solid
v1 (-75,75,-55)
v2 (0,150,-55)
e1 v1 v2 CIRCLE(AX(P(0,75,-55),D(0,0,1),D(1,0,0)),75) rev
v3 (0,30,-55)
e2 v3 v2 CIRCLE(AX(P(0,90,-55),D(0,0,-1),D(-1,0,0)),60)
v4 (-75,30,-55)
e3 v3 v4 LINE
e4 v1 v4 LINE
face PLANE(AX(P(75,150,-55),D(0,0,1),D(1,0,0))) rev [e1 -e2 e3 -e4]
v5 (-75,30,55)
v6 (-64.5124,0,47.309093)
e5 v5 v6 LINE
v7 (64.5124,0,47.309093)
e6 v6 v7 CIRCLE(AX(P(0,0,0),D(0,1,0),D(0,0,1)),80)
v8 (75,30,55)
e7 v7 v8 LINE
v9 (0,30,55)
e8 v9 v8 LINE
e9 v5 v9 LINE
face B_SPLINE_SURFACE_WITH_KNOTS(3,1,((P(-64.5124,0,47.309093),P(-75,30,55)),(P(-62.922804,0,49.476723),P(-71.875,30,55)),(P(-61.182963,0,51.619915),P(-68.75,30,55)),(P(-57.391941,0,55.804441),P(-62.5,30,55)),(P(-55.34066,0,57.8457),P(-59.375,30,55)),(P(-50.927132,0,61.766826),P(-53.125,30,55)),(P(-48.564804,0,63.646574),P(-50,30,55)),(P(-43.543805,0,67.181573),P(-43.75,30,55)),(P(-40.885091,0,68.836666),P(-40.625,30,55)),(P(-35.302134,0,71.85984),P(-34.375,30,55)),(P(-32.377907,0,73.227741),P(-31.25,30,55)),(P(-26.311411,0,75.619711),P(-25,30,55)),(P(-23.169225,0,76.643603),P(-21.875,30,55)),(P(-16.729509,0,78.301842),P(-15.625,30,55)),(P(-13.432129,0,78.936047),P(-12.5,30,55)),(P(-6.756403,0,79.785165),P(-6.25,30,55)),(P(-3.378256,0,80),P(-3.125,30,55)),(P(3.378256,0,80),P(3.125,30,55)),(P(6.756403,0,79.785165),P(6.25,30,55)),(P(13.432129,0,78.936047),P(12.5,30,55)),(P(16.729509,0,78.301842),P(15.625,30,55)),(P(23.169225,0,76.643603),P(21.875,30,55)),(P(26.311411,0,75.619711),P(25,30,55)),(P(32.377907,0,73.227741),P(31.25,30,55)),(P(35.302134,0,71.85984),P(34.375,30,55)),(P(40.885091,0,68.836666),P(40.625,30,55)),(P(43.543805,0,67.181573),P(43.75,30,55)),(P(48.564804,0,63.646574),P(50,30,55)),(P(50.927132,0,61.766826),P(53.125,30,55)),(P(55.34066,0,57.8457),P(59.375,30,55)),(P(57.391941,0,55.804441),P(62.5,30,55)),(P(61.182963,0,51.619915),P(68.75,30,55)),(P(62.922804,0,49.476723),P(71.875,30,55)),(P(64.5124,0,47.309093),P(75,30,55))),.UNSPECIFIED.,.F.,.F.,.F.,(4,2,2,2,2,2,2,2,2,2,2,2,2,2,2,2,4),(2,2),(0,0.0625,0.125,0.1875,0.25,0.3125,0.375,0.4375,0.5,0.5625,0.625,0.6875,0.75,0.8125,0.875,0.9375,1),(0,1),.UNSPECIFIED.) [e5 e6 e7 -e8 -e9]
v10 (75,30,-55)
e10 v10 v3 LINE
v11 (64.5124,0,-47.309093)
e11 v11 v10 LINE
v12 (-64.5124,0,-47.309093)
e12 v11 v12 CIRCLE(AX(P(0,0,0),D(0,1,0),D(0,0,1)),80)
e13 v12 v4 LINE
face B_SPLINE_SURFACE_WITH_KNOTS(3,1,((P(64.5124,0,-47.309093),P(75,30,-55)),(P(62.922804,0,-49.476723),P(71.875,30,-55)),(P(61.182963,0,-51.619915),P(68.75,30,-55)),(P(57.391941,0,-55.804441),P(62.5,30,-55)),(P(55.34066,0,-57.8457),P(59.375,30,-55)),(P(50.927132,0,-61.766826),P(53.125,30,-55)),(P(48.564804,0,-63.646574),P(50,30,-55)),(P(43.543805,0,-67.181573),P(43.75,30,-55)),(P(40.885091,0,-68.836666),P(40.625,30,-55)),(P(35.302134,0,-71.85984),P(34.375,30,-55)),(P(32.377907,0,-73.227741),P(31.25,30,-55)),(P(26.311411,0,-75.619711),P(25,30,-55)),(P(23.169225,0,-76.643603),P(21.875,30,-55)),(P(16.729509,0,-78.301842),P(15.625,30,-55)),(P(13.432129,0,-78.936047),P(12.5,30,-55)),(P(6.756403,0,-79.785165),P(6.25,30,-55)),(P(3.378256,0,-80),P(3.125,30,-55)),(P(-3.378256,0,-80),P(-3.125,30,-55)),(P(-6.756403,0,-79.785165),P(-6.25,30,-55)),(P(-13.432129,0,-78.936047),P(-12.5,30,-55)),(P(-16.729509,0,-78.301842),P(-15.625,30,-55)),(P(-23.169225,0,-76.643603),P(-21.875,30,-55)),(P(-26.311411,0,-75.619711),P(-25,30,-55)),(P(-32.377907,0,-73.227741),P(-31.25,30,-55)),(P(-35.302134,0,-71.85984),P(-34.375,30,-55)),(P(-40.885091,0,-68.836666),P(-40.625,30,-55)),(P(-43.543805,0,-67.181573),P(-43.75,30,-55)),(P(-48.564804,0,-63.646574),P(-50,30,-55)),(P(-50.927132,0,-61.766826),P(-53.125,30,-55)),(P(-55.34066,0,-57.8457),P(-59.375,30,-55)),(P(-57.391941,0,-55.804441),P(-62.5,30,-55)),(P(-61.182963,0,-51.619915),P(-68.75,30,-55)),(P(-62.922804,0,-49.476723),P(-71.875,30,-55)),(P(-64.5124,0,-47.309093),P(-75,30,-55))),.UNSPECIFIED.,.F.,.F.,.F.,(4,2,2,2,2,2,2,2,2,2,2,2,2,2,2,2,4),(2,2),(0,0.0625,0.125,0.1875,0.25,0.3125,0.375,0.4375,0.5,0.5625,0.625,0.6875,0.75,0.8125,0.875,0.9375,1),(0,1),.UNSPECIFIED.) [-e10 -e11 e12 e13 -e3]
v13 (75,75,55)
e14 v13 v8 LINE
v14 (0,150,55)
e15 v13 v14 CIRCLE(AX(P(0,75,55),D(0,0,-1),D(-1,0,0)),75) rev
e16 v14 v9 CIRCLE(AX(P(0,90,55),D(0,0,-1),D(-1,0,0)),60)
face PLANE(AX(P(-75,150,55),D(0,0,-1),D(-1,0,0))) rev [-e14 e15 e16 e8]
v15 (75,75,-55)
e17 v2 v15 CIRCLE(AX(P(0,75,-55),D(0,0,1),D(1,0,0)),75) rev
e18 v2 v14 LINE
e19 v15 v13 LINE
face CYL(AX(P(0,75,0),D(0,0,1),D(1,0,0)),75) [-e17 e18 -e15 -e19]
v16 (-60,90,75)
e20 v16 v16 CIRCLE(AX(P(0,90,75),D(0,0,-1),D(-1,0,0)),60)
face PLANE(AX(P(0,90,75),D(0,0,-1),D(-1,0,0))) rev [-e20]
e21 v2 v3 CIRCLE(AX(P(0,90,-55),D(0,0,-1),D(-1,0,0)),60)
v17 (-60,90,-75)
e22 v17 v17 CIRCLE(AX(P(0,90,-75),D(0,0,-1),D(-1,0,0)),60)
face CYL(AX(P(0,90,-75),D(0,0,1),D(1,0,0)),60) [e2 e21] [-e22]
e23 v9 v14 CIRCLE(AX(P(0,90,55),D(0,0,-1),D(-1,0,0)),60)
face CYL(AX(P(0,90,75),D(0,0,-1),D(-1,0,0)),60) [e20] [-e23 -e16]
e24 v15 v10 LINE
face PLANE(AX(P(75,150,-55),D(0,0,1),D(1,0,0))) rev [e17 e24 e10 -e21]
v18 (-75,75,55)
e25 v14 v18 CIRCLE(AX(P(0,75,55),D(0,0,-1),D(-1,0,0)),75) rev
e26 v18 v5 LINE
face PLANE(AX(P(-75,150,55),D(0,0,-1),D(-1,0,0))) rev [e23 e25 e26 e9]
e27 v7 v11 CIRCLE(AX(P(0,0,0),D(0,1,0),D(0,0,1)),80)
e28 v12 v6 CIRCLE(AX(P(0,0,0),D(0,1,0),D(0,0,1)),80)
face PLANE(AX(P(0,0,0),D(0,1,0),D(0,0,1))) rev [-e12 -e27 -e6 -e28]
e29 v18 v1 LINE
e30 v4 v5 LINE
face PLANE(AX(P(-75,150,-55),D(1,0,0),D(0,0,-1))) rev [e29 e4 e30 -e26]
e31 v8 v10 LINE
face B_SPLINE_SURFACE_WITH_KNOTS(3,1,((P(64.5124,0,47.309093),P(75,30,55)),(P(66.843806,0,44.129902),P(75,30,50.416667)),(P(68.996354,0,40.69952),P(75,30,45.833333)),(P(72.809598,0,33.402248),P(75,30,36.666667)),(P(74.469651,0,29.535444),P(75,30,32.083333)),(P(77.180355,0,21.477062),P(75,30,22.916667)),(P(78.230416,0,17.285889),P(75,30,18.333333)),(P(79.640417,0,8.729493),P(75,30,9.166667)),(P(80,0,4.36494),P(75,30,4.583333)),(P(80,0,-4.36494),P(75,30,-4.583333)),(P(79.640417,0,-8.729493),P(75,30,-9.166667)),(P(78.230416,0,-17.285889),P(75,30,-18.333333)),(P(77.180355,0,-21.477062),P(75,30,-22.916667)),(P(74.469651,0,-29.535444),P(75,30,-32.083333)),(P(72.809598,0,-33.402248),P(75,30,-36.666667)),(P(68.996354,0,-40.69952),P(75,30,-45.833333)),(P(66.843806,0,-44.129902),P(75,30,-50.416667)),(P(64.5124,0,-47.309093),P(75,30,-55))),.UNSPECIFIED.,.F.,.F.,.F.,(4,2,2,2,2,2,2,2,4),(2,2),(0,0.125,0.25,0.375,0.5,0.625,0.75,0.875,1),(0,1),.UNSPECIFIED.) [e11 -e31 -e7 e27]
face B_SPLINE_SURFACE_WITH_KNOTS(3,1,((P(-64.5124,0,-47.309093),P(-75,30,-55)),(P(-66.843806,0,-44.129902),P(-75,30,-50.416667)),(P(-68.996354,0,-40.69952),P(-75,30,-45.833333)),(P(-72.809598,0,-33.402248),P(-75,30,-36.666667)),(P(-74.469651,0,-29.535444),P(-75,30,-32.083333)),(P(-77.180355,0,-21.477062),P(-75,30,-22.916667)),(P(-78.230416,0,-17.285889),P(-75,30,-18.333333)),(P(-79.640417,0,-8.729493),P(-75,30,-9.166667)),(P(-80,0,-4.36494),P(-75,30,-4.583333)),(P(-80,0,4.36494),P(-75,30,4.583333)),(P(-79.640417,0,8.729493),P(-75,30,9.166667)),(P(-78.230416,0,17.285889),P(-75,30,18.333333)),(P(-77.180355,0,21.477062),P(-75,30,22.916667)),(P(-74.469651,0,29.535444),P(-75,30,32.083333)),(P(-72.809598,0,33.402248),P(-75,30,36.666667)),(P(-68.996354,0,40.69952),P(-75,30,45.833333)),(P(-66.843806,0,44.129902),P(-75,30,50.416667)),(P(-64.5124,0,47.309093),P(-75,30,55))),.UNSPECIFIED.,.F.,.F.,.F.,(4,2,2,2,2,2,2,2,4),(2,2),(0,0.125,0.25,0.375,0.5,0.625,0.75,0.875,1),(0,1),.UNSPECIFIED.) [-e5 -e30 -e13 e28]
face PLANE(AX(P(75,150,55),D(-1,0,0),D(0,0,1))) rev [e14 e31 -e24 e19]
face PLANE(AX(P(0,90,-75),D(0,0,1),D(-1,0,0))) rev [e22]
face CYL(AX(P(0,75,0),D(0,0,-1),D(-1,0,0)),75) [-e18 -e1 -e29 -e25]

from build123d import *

# Parameters (mm, degrees)
SKIZZE4_W                       = 150
SKIZZE4_H                       = 110
AUFSATZ_LINEAR_AUSTRAGEN1_DEPTH = 120
SKIZZE5_R                       = 60
AUFSATZ_LINEAR_AUSTRAGEN2_DEPTH = 20
VERRUNDUNG1_R                   = 75


with BuildPart() as part:
    # Skizze1 for Ausformung1 → Ausformung1 section 0
    with BuildSketch(Plane(origin=(0, 0, 0), x_dir=(1, 0, 0), z_dir=(0, 1, 0))):
        with BuildLine():
            # circular arc as an exact rational Bezier (weights 1, cos(half-angle), 1)
            Bezier((-64.512399668, -47.30909309), (0, -135.280547185), (64.512399668, -47.30909309), weights=[1, 0.591363664, 1])
            Bezier((64.512399668, -47.30909309), (99.205734602, 0), (64.512399668, 47.30909309), weights=[1, 0.806404996, 1])
            Bezier((64.512399668, 47.30909309), (0, 135.280547185), (-64.512399668, 47.30909309), weights=[1, 0.591363664, 1])
            Bezier((-64.512399668, 47.30909309), (-99.205734602, 0), (-64.512399668, -47.30909309), weights=[1, 0.806404996, 1])
        make_face()
    # Skizze2 → Ausformung1 section 1
    with BuildSketch(Plane(origin=(0, 30, 0), x_dir=(1, 0, 0), z_dir=(0, 1, 0))):
        with BuildLine():
            Line((-75, -55), (75, -55))
            Line((75, -55), (75, 55))
            Line((75, 55), (-75, 55))
            Line((-75, 55), (-75, -55))
        make_face()
    loft()

    # Skizze4 → Aufsatz-Linear austragen1 (add)
    with BuildSketch(Plane(origin=(0, 30, 0), x_dir=(1, 0, 0), z_dir=(0, 1, 0))):
        Rectangle(SKIZZE4_W, SKIZZE4_H)
    extrude(amount=AUFSATZ_LINEAR_AUSTRAGEN1_DEPTH)

    # Skizze5 → Aufsatz-Linear austragen2 (add)
    with BuildSketch(Plane(origin=(-20, 0, 55), x_dir=(-1, 0, 0), z_dir=(0, 0, -1))):
        with Locations((-20, 90)):
            Circle(SKIZZE5_R)
    aufsatz_linear_austragen2 = extrude(amount=-AUFSATZ_LINEAR_AUSTRAGEN2_DEPTH)

    # Spiegeln1: Aufsatz-Linear austragen2 across plane
    add(aufsatz_linear_austragen2.mirror(Plane.XY))

    # Verrundung1
    # the kernel refuses this fillet: 75 mm, written as the material it takes off along each edge
    with BuildSketch(Plane(origin=(75, 150, 242.5), x_dir=(0, -1, 0), z_dir=(0, 0, -1))) as verrundung1_piece_1:
        with BuildLine():
            CenterArc((VERRUNDUNG1_R, VERRUNDUNG1_R), VERRUNDUNG1_R, 180, 90)
            Line((0, VERRUNDUNG1_R), (0, 0))
            Line((0, 0), (VERRUNDUNG1_R, 0))
        make_face()
    extrude(amount=485, mode=Mode.SUBTRACT)
    with BuildSketch(Plane(origin=(-75, 150, -242.5), x_dir=(1, 0, 0), z_dir=(0, 0, 1))) as verrundung1_piece_2:
        with BuildLine():
            CenterArc((VERRUNDUNG1_R, -VERRUNDUNG1_R), VERRUNDUNG1_R, 90, 90)
            Line((0, -VERRUNDUNG1_R), (0, 0))
            Line((0, 0), (VERRUNDUNG1_R, 0))
        make_face()
    extrude(amount=485, mode=Mode.SUBTRACT)


solid = part.part
